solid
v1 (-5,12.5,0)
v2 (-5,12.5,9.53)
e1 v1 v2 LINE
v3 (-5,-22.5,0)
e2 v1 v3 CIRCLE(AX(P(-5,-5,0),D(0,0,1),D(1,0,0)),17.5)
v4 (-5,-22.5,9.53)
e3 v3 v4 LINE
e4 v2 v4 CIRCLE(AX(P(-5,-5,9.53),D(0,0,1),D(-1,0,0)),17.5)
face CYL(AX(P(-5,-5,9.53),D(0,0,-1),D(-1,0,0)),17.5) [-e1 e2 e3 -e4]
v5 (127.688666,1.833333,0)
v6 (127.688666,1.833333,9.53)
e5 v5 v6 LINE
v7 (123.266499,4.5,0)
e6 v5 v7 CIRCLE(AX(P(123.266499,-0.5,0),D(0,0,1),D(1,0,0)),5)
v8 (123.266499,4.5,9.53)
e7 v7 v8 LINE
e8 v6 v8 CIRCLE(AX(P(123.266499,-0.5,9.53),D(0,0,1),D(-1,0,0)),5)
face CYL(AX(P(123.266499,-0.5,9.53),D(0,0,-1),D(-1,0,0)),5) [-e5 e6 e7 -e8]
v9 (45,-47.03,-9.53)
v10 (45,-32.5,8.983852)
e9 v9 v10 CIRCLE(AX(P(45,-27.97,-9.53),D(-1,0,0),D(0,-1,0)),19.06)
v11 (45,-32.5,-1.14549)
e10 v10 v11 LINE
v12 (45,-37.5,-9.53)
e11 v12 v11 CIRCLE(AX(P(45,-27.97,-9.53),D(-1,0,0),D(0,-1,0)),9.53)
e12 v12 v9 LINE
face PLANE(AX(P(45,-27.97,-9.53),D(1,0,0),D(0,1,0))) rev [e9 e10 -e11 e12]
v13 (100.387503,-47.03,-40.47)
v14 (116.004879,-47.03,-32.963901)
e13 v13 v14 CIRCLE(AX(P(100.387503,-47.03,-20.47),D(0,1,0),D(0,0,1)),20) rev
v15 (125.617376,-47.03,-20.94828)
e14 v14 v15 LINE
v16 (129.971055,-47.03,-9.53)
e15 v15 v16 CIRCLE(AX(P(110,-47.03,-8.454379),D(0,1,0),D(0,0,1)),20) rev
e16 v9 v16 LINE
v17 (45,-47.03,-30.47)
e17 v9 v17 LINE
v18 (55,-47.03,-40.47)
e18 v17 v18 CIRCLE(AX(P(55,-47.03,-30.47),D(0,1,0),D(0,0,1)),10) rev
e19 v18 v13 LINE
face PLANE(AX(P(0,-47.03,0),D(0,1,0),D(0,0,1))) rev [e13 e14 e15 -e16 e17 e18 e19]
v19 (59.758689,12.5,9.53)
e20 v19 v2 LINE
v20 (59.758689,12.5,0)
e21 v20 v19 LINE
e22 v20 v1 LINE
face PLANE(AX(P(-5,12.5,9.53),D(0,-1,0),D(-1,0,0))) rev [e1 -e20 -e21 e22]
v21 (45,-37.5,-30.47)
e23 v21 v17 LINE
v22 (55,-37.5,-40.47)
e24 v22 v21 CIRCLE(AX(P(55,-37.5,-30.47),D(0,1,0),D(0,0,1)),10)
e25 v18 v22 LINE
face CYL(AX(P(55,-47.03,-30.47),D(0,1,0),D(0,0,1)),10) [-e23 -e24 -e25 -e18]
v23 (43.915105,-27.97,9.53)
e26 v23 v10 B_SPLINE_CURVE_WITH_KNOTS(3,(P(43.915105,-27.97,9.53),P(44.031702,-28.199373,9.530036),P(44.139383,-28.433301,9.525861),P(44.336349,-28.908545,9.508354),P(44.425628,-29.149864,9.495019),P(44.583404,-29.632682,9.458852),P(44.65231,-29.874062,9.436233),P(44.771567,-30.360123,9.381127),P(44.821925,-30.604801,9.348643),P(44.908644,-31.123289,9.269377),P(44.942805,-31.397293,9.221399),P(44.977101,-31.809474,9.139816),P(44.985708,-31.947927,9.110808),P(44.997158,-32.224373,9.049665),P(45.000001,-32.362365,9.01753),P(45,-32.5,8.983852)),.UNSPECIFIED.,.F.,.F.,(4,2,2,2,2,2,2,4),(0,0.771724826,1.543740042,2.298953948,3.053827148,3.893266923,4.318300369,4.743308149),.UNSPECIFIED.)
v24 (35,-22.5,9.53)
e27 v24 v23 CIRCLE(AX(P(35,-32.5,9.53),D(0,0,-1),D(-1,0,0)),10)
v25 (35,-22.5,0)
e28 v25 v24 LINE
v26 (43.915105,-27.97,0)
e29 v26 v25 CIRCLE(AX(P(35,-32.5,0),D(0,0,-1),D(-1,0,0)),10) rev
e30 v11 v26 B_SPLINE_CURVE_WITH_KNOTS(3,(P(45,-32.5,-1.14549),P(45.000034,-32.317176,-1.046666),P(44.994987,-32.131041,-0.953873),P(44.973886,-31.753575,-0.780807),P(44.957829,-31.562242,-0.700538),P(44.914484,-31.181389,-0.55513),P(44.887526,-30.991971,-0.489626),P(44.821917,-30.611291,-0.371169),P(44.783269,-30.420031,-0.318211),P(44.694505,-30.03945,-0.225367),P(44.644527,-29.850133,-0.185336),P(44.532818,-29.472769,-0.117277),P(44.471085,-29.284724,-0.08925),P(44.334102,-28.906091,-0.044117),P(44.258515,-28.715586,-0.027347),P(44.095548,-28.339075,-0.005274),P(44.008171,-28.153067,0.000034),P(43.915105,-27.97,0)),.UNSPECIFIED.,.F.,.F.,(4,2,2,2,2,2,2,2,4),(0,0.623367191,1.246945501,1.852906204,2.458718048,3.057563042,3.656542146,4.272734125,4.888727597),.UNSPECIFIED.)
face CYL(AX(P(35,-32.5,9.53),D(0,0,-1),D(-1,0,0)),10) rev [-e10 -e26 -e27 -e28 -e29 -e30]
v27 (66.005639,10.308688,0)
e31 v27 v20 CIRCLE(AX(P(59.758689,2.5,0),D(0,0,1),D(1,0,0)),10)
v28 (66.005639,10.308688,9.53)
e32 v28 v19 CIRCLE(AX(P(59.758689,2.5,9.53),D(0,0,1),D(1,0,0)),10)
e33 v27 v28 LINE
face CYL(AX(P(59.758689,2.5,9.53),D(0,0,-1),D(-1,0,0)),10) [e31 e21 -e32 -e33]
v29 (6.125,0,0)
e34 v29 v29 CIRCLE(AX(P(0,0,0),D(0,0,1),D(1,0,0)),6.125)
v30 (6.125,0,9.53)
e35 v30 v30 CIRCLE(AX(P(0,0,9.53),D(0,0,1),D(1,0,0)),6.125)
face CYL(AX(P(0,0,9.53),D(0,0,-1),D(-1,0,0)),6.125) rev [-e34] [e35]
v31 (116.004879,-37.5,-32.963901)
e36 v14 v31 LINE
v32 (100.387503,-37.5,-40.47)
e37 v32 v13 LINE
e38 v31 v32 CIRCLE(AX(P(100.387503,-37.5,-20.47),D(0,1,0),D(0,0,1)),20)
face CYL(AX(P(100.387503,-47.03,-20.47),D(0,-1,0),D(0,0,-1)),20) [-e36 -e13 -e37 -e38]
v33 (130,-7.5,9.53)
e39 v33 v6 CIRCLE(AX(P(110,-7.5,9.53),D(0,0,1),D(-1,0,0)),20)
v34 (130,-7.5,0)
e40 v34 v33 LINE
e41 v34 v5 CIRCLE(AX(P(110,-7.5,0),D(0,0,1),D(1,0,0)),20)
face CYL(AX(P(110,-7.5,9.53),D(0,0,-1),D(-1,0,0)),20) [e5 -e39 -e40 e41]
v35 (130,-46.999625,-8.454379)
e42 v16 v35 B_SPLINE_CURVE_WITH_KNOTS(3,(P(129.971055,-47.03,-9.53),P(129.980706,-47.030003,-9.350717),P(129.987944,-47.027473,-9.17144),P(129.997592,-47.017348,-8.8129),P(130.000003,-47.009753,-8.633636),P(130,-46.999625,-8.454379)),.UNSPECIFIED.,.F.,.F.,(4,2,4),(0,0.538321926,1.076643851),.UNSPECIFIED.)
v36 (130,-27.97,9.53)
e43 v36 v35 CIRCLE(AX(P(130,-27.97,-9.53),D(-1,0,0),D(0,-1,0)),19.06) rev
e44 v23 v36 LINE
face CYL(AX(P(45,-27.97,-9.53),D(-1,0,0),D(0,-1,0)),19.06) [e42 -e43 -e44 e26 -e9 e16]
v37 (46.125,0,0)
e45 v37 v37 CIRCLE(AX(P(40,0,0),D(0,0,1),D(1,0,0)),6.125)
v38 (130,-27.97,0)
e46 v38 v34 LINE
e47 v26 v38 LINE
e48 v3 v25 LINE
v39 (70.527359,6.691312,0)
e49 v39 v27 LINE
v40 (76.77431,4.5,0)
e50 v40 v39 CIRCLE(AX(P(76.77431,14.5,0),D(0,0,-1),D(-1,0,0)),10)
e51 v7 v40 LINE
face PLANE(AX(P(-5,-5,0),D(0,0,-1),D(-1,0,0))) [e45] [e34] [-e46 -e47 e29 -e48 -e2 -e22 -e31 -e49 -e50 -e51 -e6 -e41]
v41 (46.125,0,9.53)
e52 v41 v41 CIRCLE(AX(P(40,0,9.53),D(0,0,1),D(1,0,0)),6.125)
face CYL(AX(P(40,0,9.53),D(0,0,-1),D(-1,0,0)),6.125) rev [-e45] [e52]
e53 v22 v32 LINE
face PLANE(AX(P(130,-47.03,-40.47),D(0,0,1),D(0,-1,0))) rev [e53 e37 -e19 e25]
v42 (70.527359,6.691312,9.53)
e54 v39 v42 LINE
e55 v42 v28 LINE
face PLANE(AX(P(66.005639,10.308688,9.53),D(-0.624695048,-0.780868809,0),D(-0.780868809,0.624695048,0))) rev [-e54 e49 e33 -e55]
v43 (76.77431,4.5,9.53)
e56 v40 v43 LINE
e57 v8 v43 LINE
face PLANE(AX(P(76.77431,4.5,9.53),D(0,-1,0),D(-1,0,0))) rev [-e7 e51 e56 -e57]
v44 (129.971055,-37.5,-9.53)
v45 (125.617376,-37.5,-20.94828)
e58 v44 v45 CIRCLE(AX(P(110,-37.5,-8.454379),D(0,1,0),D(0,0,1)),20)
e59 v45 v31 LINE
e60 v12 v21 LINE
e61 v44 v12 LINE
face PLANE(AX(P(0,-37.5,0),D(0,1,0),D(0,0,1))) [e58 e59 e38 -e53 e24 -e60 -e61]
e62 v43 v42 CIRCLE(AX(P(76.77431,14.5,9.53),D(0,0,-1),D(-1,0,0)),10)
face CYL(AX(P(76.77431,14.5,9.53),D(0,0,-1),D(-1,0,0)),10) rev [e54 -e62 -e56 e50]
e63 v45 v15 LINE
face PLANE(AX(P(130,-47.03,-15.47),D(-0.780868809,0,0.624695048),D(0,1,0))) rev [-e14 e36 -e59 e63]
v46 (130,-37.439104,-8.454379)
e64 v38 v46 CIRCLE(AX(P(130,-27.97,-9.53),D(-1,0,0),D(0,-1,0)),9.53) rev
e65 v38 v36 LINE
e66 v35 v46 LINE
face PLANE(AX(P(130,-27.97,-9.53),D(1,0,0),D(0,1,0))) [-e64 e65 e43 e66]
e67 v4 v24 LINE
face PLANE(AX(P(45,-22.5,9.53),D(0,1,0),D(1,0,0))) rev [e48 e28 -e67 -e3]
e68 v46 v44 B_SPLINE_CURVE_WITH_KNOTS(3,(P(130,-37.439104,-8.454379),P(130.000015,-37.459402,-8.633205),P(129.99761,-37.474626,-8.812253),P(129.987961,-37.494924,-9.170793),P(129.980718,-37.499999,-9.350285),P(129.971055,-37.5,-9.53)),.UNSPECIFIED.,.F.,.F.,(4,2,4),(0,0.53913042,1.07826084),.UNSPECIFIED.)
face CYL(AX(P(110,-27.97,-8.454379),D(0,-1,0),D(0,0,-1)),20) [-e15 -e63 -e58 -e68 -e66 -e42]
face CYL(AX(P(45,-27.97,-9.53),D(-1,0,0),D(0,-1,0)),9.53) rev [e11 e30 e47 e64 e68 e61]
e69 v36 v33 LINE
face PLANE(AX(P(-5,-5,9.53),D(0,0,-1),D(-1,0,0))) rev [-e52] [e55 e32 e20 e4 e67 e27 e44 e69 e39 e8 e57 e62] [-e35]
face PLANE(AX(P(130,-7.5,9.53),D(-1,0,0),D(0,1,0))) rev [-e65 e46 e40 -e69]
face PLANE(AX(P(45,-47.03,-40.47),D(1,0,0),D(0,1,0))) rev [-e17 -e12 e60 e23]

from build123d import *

# Parameters (mm, degrees)
CROQUIS1_R                       = 6.125
SALIENTE_EXTRUIR1_DEPTH          = 9.53
BRIDA_DE_ARISTA1_STRIP_W         = 57.18
BRIDA_DE_ARISTA1_STRIP_H         = 9.53
BRIDA_DE_ARISTA1_STRIP_CUT_DEPTH = 85
BRIDA_DE_ARISTA1_DEPTH           = 85
REDONDEO3_R                      = 10
CHAFL_N1_START                   = 111.176977613
CHAFL_N1_OUTLINE_W               = 35
CHAFL_N1_OUTLINE_H               = 9.53
CHAFL_N1_DEPTH                   = 16.823022387
REDONDEO4_R                      = 20


with BuildPart() as part:
    # Croquis1 → Saliente-Extruir1 (new body)
    with BuildSketch(Plane.XY):
        with BuildLine():
            Line((-5, 12.5), (59.758688568, 12.5))
            ThreePointArc((59.758688568, 12.5), (63.068757982, 11.936283192), (66.005639043, 10.308688094))
            Line((66.005639043, 10.308688094), (70.527359279, 6.691311906))
            ThreePointArc((70.527359279, 6.691311906), (73.464240341, 5.063716808), (76.774309755, 4.5))
            Line((76.774309755, 4.5), (123.266499161, 4.5))
            ThreePointArc((123.266499161, 4.5), (125.848488059, 3.781744193), (127.688665549, 1.833333333))
            ThreePointArc((127.688665549, 1.833333333), (129.41356885, -2.692366017), (130, -7.5))
            Line((130, -7.5), (130, -37.5))
            Line((130, -37.5), (45, -37.5))
            Line((45, -37.5), (45, -22.5))
            Line((45, -22.5), (-5, -22.5))
            ThreePointArc((-5, -22.5), (-22.5, -5), (-5, 12.5))
        make_face()
        Circle(CROQUIS1_R, mode=Mode.SUBTRACT)
        with Locations((40, 0)):
            Circle(CROQUIS1_R, mode=Mode.SUBTRACT)
    extrude(amount=SALIENTE_EXTRUIR1_DEPTH)

    # Brida de arista1: sheet metal written as solids
    # Brida de arista1 strip (on a plane across the edge) → Brida de arista1 strip cut (cut)
    with BuildSketch(Plane(origin=(130, -37.5, 0), x_dir=(0, 1, 0), z_dir=(-1, 0, 0))):
        with Locations((-19.06, -4.765)):
            Rectangle(BRIDA_DE_ARISTA1_STRIP_W, BRIDA_DE_ARISTA1_STRIP_H)
    extrude(amount=BRIDA_DE_ARISTA1_STRIP_CUT_DEPTH, mode=Mode.SUBTRACT)

    # Brida de arista1 section (on a plane across the edge) → Brida de arista1 (add)
    with BuildSketch(Plane(origin=(130, -37.5, 0), x_dir=(0, 1, 0), z_dir=(-1, 0, 0))):
        with BuildLine():
            Line((-9.53, 9.53), (-9.53, 40.47))
            Line((-9.53, 40.47), (0, 40.47))
            Line((0, 40.47), (0, 9.53))
            ThreePointArc((0, 9.53), (2.791272375, 2.791272375), (9.53, 0))
            Line((9.53, 0), (9.53, -9.53))
            ThreePointArc((9.53, -9.53), (-3.947455249, -3.947455249), (-9.53, 9.53))
        make_face()
    extrude(amount=BRIDA_DE_ARISTA1_DEPTH)

    # Redondeo3
    redondeo3_edges = [part.edges().sort_by_distance(p)[0] for p in [
        (45, -22.5, 4.765),
        (45, -42.265, -40.47),
    ]]
    fillet(redondeo3_edges, radius=REDONDEO3_R)

    # Chaflán1: read off the stored shape, not the designer's step
    # Chaflán1 outline → Chaflán1 (cut)
    with BuildSketch(Plane(origin=(0, 0, 0), x_dir=(0.6246950475544231, 0, 0.7808688094430313), z_dir=(0.7808688094430313, 0, -0.6246950475544232)).offset(CHAFL_N1_START)):
        with Locations((53.5, 42.265)):
            Rectangle(CHAFL_N1_OUTLINE_W, CHAFL_N1_OUTLINE_H)
    extrude(amount=CHAFL_N1_DEPTH, mode=Mode.SUBTRACT)

    # Redondeo4
    redondeo4_edges = [part.edges().sort_by_distance(p)[0] for p in [
        (110, -42.265, -40.47),
        (130, -42.265, -15.47),
    ]]
    fillet(redondeo4_edges, radius=REDONDEO4_R)


solid = part.part
